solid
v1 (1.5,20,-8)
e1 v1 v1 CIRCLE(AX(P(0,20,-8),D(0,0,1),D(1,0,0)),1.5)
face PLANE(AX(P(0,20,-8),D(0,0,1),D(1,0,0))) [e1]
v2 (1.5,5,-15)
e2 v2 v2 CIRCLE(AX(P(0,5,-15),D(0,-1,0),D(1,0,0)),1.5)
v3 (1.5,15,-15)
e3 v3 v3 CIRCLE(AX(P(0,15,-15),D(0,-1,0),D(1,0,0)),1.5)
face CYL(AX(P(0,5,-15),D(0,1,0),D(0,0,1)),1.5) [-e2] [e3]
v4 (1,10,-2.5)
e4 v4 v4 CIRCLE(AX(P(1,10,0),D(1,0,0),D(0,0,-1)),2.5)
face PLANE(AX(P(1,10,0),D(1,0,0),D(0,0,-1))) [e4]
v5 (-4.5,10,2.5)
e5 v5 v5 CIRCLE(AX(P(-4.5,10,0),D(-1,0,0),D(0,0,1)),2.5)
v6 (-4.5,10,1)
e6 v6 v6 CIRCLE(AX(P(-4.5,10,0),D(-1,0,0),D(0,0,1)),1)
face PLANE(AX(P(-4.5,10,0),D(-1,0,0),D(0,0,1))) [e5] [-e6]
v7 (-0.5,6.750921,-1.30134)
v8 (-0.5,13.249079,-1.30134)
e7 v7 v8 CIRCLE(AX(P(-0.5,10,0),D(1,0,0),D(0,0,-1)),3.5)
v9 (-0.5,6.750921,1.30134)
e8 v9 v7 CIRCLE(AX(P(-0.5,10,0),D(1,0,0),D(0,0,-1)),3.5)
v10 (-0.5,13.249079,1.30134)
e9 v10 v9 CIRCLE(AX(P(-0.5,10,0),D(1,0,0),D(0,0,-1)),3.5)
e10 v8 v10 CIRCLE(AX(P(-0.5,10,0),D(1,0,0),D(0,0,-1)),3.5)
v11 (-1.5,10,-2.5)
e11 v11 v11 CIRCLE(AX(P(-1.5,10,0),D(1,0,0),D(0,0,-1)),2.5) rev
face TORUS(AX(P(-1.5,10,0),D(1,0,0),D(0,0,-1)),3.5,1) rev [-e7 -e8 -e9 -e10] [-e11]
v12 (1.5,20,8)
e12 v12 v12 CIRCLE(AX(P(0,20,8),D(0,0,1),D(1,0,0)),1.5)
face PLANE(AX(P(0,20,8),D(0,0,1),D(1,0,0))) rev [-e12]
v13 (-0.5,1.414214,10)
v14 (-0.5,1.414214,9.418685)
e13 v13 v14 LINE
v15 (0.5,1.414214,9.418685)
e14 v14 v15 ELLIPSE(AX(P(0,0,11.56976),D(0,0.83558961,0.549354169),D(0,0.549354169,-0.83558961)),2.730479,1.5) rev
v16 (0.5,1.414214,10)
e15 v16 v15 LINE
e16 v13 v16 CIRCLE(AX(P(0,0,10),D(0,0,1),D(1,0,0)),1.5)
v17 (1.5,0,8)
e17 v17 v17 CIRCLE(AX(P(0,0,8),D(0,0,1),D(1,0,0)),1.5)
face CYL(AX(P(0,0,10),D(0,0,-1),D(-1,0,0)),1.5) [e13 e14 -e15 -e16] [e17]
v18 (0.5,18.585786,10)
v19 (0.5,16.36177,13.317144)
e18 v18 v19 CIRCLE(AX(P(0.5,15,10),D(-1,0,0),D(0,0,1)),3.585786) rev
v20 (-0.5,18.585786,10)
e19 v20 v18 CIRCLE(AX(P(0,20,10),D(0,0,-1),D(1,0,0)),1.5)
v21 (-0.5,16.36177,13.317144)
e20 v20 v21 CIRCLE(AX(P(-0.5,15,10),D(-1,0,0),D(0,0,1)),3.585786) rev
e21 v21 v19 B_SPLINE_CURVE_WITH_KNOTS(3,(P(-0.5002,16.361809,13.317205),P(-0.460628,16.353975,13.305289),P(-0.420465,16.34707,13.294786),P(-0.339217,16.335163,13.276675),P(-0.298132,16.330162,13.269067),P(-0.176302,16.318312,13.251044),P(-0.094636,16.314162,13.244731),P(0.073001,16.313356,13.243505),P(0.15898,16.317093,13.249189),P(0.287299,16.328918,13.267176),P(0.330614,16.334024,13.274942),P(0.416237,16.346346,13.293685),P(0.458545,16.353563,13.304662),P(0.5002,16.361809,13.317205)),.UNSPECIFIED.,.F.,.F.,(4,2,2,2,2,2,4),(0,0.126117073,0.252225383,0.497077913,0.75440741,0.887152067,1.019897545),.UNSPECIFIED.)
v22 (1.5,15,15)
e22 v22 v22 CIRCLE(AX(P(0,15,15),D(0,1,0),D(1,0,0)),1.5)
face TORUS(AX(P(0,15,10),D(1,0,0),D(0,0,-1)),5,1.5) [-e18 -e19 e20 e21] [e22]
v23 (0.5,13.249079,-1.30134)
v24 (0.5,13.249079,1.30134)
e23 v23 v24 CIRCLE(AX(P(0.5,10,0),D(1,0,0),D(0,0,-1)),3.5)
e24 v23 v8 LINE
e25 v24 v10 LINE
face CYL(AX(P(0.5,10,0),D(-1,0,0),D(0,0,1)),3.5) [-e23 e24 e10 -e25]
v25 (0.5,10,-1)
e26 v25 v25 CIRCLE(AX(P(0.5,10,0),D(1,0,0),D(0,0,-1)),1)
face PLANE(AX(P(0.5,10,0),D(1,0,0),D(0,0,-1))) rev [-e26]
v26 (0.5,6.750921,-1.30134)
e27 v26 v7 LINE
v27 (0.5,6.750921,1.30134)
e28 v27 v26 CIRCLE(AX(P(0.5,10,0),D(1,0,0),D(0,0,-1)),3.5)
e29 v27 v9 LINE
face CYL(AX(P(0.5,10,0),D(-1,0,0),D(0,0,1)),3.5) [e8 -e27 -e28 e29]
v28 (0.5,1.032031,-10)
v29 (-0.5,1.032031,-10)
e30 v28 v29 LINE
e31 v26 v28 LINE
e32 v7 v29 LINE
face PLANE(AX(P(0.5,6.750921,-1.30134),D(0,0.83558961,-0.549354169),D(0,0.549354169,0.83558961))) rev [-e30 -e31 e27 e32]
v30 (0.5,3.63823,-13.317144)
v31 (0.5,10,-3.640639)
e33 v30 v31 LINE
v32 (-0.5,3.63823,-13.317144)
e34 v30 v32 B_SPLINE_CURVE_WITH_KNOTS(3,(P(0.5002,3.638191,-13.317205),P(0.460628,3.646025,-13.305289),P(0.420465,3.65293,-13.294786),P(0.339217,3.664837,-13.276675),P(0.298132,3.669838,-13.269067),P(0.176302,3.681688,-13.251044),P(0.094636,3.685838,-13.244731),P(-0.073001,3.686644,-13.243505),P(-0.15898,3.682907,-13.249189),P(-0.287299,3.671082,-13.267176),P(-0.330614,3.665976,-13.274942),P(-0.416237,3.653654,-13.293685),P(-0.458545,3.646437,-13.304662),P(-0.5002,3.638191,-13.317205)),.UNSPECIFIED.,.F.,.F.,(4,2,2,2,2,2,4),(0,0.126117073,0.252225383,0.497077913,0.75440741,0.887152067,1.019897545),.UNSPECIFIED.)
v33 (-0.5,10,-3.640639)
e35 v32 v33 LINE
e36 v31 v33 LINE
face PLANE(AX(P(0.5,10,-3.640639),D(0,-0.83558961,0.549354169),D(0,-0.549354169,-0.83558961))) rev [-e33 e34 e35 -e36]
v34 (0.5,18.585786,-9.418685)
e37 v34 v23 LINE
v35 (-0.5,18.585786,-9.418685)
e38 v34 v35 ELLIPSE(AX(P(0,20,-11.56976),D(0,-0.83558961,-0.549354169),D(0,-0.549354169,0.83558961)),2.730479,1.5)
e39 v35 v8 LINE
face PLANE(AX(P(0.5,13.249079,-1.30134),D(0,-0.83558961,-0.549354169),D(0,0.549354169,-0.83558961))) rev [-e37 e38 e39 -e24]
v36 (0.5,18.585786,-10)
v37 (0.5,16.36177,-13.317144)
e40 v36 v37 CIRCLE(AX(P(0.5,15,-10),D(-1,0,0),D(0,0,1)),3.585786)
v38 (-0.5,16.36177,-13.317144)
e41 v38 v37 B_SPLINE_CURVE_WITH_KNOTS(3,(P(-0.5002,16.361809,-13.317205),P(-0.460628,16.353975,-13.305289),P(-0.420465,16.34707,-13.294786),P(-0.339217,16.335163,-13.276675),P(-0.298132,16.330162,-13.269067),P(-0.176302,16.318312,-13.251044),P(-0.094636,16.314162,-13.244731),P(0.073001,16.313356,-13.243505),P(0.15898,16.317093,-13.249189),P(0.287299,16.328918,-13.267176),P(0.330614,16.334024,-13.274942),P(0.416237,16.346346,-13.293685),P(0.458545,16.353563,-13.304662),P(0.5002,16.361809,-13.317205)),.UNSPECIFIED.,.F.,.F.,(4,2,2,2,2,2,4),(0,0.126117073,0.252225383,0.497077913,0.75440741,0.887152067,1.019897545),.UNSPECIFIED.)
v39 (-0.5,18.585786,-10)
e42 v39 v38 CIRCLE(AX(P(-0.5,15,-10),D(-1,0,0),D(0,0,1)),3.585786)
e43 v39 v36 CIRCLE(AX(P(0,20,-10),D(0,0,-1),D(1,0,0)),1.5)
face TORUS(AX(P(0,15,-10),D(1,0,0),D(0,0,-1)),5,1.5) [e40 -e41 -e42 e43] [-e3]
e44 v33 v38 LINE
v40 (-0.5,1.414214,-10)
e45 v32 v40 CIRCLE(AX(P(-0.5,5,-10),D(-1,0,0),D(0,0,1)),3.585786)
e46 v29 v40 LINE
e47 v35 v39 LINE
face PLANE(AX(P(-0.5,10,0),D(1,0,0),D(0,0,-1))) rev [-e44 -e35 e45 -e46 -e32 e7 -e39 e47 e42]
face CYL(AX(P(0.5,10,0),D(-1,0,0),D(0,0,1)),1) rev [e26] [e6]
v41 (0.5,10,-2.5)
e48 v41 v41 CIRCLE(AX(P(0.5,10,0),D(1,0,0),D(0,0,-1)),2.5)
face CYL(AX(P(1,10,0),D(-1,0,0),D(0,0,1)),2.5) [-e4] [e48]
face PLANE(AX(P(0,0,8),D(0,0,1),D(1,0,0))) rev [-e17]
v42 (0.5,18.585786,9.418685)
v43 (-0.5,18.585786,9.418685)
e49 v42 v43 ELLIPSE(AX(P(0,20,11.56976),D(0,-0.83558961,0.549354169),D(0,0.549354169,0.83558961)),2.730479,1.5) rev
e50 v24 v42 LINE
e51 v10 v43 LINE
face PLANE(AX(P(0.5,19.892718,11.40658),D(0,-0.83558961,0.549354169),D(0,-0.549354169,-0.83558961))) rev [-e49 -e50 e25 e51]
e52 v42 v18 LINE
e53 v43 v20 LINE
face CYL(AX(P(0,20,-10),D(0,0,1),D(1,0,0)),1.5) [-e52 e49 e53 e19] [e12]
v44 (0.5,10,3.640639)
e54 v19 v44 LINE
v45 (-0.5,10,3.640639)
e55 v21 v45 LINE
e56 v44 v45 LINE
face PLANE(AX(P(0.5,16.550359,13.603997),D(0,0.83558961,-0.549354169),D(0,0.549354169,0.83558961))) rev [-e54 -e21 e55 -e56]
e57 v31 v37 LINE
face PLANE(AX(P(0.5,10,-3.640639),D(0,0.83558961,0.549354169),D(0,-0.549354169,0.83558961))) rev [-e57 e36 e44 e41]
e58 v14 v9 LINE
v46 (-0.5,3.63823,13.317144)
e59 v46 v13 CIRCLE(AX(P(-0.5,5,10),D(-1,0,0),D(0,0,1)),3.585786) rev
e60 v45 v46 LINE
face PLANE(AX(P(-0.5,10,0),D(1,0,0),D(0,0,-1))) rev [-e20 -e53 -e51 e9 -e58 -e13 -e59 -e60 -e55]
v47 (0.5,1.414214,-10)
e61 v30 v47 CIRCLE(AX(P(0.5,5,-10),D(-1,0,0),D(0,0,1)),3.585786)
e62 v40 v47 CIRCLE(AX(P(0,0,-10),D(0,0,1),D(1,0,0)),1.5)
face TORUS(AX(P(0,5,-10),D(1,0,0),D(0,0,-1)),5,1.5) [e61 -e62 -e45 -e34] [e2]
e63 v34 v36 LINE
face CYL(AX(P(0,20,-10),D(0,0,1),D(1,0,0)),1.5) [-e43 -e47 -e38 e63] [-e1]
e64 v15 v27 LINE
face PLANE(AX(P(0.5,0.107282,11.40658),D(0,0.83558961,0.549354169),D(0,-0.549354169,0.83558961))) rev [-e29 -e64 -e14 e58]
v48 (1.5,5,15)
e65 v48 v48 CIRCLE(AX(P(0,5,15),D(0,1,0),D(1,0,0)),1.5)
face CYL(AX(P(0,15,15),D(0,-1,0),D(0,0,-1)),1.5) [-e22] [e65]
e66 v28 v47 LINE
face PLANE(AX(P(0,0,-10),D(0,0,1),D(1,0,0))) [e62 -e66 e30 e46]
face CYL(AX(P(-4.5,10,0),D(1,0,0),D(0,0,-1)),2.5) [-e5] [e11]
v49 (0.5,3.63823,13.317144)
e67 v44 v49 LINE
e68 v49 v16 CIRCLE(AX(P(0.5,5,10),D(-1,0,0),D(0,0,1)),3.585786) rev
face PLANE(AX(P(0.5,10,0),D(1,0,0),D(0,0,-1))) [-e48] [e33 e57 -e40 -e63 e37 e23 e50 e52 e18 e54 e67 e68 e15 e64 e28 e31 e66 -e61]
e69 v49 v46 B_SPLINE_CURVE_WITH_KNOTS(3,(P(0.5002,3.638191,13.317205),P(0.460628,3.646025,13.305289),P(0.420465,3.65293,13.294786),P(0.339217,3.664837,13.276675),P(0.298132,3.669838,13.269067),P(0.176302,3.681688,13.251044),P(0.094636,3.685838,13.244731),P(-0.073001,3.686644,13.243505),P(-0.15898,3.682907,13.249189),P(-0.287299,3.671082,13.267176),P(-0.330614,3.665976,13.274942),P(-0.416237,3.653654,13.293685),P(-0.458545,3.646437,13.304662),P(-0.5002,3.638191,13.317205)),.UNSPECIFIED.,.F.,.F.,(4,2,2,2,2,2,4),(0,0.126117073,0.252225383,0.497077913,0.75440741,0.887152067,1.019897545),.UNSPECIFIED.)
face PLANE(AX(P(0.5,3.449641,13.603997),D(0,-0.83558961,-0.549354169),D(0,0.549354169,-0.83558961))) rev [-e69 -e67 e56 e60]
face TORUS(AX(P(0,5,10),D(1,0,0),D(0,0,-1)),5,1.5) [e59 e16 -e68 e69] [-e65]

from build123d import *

# Parameters (mm, degrees)
SKETCH14_R          = 1.5
SKETCH15_R          = 1.5
CUT_EXTRUDE4_DEPTH  = 8
SKETCH16_R          = 1
BOSS_EXTRUDE4_DEPTH = 0.5
SKETCH17_R          = 2.5
BOSS_EXTRUDE5_DEPTH = 0.5
SKETCH18_R          = 2.5
SKETCH18_R_2        = 1
BOSS_EXTRUDE6_DEPTH = 4
FILLET2_R           = 1


with BuildPart() as part:
    # Sweep3: sweep along a path in Sketch12
    with BuildLine(Plane(origin=(0, 0, 0), x_dir=(0, 0, -1), z_dir=(1, 0, 0))) as sweep3_path:
        Line((0, 0), (-10, 0))
        ThreePointArc((-10, 0), (-13.535533906, 1.464466094), (-15, 5))
        Line((-15, 5), (-15, 15))
        ThreePointArc((-15, 15), (-13.535533906, 18.535533906), (-10, 20))
        Line((-10, 20), (10, 20))
        ThreePointArc((10, 20), (13.535533906, 18.535533906), (15, 15))
        Line((15, 15), (15, 5))
        ThreePointArc((15, 5), (13.535533906, 1.464466094), (10, 0))
    # Sketch14 → Sweep3 (sweep)
    with BuildSketch(Plane.XY):
        Circle(SKETCH14_R)
    sweep(path=sweep3_path.line)

    # Sketch15 → Cut-Extrude4 (cut, symmetric)
    with BuildSketch(Plane.XY):
        with Locations(Location((0, 0, 0), (0, 0, 270))):
            Circle(SKETCH15_R)
        with Locations((0, 20)):
            Circle(SKETCH15_R)
    extrude(amount=CUT_EXTRUDE4_DEPTH, both=True, mode=Mode.SUBTRACT)


with BuildPart() as cut_extrude4_piece_1:
    # of the separate pieces the step leaves, piece 1, a body of its own (cut_extrude4_pieces)
    add(part.part.solids().sort_by_distance((1.5, 0, 8))[0])



with BuildPart() as cut_extrude4_piece_2:
    # of the separate pieces the step leaves, piece 2, a body of its own (cut_extrude4_pieces)
    add(part.part.solids().sort_by_distance((1.5, 20, -8))[0])


with BuildPart() as cut_extrude4_piece_1_1:
    add(cut_extrude4_piece_1.part)

    add(cut_extrude4_piece_2.part)  # Boss-Extrude4 merges Cut-Extrude4 piece 2
    # Sketch16 → Boss-Extrude4 (add, symmetric)
    with BuildSketch(Plane(origin=(0, 0, 0), x_dir=(0, 0, -1), z_dir=(1, 0, 0))):
        with BuildLine():
            Line((1.301340093, 13.24907894), (11.406580041, 19.892717907))
            ThreePointArc((11.406580041, 19.892717907), (12.616460575, 18.294628285), (13.603996717, 16.550359466))
            Line((13.603996717, 16.550359466), (3.640638612, 10))
            Line((3.640638612, 10), (13.603996717, 3.449640534))
            ThreePointArc((13.603996717, 3.449640534), (12.616460575, 1.705371715), (11.406580041, 0.107282093))
            Line((11.406580041, 0.107282093), (1.301340093, 6.75092106))
            ThreePointArc((1.301340093, 6.75092106), (0, 6.5), (-1.301340093, 6.75092106))
            Line((-1.301340093, 6.75092106), (-11.406580041, 0.107282093))
            ThreePointArc((-11.406580041, 0.107282093), (-12.616460575, 1.705371715), (-13.603996717, 3.449640534))
            Line((-13.603996717, 3.449640534), (-3.640638612, 10))
            Line((-3.640638612, 10), (-13.603996717, 16.550359466))
            ThreePointArc((-13.603996717, 16.550359466), (-12.616460575, 18.294628285), (-11.406580041, 19.892717907))
            Line((-11.406580041, 19.892717907), (-1.301340093, 13.24907894))
            ThreePointArc((-1.301340093, 13.24907894), (0, 13.5), (1.301340093, 13.24907894))
        make_face()
        with Locations((0, 10)):
            Circle(SKETCH16_R, mode=Mode.SUBTRACT)
    extrude(amount=BOSS_EXTRUDE4_DEPTH, both=True)

    # Sketch17 → Boss-Extrude5 (add)
    with BuildSketch(Plane(origin=(0.5, 0, 0), x_dir=(0, 0, -1), z_dir=(1, 0, 0))):
        with Locations((0, 10)):
            Circle(SKETCH17_R)
    extrude(amount=BOSS_EXTRUDE5_DEPTH)

    # Sketch18 → Boss-Extrude6 (add)
    with BuildSketch(Plane.ZY.offset(0.5)):
        with Locations(Location((0, 10, 0), (0, 0, 180))):
            Circle(SKETCH18_R)
        with Locations((0, 10)):
            Circle(SKETCH18_R_2, mode=Mode.SUBTRACT)
    extrude(amount=BOSS_EXTRUDE6_DEPTH)

    # Fillet2
    fillet2_edges = [cut_extrude4_piece_1_1.edges().sort_by_distance(p)[0] for p in [
        (-0.5, 10, 2.5),
    ]]
    fillet(fillet2_edges, radius=FILLET2_R - 0.0001)  # a hair under: the kernel refuses the full size


solid = cut_extrude4_piece_1_1.part
